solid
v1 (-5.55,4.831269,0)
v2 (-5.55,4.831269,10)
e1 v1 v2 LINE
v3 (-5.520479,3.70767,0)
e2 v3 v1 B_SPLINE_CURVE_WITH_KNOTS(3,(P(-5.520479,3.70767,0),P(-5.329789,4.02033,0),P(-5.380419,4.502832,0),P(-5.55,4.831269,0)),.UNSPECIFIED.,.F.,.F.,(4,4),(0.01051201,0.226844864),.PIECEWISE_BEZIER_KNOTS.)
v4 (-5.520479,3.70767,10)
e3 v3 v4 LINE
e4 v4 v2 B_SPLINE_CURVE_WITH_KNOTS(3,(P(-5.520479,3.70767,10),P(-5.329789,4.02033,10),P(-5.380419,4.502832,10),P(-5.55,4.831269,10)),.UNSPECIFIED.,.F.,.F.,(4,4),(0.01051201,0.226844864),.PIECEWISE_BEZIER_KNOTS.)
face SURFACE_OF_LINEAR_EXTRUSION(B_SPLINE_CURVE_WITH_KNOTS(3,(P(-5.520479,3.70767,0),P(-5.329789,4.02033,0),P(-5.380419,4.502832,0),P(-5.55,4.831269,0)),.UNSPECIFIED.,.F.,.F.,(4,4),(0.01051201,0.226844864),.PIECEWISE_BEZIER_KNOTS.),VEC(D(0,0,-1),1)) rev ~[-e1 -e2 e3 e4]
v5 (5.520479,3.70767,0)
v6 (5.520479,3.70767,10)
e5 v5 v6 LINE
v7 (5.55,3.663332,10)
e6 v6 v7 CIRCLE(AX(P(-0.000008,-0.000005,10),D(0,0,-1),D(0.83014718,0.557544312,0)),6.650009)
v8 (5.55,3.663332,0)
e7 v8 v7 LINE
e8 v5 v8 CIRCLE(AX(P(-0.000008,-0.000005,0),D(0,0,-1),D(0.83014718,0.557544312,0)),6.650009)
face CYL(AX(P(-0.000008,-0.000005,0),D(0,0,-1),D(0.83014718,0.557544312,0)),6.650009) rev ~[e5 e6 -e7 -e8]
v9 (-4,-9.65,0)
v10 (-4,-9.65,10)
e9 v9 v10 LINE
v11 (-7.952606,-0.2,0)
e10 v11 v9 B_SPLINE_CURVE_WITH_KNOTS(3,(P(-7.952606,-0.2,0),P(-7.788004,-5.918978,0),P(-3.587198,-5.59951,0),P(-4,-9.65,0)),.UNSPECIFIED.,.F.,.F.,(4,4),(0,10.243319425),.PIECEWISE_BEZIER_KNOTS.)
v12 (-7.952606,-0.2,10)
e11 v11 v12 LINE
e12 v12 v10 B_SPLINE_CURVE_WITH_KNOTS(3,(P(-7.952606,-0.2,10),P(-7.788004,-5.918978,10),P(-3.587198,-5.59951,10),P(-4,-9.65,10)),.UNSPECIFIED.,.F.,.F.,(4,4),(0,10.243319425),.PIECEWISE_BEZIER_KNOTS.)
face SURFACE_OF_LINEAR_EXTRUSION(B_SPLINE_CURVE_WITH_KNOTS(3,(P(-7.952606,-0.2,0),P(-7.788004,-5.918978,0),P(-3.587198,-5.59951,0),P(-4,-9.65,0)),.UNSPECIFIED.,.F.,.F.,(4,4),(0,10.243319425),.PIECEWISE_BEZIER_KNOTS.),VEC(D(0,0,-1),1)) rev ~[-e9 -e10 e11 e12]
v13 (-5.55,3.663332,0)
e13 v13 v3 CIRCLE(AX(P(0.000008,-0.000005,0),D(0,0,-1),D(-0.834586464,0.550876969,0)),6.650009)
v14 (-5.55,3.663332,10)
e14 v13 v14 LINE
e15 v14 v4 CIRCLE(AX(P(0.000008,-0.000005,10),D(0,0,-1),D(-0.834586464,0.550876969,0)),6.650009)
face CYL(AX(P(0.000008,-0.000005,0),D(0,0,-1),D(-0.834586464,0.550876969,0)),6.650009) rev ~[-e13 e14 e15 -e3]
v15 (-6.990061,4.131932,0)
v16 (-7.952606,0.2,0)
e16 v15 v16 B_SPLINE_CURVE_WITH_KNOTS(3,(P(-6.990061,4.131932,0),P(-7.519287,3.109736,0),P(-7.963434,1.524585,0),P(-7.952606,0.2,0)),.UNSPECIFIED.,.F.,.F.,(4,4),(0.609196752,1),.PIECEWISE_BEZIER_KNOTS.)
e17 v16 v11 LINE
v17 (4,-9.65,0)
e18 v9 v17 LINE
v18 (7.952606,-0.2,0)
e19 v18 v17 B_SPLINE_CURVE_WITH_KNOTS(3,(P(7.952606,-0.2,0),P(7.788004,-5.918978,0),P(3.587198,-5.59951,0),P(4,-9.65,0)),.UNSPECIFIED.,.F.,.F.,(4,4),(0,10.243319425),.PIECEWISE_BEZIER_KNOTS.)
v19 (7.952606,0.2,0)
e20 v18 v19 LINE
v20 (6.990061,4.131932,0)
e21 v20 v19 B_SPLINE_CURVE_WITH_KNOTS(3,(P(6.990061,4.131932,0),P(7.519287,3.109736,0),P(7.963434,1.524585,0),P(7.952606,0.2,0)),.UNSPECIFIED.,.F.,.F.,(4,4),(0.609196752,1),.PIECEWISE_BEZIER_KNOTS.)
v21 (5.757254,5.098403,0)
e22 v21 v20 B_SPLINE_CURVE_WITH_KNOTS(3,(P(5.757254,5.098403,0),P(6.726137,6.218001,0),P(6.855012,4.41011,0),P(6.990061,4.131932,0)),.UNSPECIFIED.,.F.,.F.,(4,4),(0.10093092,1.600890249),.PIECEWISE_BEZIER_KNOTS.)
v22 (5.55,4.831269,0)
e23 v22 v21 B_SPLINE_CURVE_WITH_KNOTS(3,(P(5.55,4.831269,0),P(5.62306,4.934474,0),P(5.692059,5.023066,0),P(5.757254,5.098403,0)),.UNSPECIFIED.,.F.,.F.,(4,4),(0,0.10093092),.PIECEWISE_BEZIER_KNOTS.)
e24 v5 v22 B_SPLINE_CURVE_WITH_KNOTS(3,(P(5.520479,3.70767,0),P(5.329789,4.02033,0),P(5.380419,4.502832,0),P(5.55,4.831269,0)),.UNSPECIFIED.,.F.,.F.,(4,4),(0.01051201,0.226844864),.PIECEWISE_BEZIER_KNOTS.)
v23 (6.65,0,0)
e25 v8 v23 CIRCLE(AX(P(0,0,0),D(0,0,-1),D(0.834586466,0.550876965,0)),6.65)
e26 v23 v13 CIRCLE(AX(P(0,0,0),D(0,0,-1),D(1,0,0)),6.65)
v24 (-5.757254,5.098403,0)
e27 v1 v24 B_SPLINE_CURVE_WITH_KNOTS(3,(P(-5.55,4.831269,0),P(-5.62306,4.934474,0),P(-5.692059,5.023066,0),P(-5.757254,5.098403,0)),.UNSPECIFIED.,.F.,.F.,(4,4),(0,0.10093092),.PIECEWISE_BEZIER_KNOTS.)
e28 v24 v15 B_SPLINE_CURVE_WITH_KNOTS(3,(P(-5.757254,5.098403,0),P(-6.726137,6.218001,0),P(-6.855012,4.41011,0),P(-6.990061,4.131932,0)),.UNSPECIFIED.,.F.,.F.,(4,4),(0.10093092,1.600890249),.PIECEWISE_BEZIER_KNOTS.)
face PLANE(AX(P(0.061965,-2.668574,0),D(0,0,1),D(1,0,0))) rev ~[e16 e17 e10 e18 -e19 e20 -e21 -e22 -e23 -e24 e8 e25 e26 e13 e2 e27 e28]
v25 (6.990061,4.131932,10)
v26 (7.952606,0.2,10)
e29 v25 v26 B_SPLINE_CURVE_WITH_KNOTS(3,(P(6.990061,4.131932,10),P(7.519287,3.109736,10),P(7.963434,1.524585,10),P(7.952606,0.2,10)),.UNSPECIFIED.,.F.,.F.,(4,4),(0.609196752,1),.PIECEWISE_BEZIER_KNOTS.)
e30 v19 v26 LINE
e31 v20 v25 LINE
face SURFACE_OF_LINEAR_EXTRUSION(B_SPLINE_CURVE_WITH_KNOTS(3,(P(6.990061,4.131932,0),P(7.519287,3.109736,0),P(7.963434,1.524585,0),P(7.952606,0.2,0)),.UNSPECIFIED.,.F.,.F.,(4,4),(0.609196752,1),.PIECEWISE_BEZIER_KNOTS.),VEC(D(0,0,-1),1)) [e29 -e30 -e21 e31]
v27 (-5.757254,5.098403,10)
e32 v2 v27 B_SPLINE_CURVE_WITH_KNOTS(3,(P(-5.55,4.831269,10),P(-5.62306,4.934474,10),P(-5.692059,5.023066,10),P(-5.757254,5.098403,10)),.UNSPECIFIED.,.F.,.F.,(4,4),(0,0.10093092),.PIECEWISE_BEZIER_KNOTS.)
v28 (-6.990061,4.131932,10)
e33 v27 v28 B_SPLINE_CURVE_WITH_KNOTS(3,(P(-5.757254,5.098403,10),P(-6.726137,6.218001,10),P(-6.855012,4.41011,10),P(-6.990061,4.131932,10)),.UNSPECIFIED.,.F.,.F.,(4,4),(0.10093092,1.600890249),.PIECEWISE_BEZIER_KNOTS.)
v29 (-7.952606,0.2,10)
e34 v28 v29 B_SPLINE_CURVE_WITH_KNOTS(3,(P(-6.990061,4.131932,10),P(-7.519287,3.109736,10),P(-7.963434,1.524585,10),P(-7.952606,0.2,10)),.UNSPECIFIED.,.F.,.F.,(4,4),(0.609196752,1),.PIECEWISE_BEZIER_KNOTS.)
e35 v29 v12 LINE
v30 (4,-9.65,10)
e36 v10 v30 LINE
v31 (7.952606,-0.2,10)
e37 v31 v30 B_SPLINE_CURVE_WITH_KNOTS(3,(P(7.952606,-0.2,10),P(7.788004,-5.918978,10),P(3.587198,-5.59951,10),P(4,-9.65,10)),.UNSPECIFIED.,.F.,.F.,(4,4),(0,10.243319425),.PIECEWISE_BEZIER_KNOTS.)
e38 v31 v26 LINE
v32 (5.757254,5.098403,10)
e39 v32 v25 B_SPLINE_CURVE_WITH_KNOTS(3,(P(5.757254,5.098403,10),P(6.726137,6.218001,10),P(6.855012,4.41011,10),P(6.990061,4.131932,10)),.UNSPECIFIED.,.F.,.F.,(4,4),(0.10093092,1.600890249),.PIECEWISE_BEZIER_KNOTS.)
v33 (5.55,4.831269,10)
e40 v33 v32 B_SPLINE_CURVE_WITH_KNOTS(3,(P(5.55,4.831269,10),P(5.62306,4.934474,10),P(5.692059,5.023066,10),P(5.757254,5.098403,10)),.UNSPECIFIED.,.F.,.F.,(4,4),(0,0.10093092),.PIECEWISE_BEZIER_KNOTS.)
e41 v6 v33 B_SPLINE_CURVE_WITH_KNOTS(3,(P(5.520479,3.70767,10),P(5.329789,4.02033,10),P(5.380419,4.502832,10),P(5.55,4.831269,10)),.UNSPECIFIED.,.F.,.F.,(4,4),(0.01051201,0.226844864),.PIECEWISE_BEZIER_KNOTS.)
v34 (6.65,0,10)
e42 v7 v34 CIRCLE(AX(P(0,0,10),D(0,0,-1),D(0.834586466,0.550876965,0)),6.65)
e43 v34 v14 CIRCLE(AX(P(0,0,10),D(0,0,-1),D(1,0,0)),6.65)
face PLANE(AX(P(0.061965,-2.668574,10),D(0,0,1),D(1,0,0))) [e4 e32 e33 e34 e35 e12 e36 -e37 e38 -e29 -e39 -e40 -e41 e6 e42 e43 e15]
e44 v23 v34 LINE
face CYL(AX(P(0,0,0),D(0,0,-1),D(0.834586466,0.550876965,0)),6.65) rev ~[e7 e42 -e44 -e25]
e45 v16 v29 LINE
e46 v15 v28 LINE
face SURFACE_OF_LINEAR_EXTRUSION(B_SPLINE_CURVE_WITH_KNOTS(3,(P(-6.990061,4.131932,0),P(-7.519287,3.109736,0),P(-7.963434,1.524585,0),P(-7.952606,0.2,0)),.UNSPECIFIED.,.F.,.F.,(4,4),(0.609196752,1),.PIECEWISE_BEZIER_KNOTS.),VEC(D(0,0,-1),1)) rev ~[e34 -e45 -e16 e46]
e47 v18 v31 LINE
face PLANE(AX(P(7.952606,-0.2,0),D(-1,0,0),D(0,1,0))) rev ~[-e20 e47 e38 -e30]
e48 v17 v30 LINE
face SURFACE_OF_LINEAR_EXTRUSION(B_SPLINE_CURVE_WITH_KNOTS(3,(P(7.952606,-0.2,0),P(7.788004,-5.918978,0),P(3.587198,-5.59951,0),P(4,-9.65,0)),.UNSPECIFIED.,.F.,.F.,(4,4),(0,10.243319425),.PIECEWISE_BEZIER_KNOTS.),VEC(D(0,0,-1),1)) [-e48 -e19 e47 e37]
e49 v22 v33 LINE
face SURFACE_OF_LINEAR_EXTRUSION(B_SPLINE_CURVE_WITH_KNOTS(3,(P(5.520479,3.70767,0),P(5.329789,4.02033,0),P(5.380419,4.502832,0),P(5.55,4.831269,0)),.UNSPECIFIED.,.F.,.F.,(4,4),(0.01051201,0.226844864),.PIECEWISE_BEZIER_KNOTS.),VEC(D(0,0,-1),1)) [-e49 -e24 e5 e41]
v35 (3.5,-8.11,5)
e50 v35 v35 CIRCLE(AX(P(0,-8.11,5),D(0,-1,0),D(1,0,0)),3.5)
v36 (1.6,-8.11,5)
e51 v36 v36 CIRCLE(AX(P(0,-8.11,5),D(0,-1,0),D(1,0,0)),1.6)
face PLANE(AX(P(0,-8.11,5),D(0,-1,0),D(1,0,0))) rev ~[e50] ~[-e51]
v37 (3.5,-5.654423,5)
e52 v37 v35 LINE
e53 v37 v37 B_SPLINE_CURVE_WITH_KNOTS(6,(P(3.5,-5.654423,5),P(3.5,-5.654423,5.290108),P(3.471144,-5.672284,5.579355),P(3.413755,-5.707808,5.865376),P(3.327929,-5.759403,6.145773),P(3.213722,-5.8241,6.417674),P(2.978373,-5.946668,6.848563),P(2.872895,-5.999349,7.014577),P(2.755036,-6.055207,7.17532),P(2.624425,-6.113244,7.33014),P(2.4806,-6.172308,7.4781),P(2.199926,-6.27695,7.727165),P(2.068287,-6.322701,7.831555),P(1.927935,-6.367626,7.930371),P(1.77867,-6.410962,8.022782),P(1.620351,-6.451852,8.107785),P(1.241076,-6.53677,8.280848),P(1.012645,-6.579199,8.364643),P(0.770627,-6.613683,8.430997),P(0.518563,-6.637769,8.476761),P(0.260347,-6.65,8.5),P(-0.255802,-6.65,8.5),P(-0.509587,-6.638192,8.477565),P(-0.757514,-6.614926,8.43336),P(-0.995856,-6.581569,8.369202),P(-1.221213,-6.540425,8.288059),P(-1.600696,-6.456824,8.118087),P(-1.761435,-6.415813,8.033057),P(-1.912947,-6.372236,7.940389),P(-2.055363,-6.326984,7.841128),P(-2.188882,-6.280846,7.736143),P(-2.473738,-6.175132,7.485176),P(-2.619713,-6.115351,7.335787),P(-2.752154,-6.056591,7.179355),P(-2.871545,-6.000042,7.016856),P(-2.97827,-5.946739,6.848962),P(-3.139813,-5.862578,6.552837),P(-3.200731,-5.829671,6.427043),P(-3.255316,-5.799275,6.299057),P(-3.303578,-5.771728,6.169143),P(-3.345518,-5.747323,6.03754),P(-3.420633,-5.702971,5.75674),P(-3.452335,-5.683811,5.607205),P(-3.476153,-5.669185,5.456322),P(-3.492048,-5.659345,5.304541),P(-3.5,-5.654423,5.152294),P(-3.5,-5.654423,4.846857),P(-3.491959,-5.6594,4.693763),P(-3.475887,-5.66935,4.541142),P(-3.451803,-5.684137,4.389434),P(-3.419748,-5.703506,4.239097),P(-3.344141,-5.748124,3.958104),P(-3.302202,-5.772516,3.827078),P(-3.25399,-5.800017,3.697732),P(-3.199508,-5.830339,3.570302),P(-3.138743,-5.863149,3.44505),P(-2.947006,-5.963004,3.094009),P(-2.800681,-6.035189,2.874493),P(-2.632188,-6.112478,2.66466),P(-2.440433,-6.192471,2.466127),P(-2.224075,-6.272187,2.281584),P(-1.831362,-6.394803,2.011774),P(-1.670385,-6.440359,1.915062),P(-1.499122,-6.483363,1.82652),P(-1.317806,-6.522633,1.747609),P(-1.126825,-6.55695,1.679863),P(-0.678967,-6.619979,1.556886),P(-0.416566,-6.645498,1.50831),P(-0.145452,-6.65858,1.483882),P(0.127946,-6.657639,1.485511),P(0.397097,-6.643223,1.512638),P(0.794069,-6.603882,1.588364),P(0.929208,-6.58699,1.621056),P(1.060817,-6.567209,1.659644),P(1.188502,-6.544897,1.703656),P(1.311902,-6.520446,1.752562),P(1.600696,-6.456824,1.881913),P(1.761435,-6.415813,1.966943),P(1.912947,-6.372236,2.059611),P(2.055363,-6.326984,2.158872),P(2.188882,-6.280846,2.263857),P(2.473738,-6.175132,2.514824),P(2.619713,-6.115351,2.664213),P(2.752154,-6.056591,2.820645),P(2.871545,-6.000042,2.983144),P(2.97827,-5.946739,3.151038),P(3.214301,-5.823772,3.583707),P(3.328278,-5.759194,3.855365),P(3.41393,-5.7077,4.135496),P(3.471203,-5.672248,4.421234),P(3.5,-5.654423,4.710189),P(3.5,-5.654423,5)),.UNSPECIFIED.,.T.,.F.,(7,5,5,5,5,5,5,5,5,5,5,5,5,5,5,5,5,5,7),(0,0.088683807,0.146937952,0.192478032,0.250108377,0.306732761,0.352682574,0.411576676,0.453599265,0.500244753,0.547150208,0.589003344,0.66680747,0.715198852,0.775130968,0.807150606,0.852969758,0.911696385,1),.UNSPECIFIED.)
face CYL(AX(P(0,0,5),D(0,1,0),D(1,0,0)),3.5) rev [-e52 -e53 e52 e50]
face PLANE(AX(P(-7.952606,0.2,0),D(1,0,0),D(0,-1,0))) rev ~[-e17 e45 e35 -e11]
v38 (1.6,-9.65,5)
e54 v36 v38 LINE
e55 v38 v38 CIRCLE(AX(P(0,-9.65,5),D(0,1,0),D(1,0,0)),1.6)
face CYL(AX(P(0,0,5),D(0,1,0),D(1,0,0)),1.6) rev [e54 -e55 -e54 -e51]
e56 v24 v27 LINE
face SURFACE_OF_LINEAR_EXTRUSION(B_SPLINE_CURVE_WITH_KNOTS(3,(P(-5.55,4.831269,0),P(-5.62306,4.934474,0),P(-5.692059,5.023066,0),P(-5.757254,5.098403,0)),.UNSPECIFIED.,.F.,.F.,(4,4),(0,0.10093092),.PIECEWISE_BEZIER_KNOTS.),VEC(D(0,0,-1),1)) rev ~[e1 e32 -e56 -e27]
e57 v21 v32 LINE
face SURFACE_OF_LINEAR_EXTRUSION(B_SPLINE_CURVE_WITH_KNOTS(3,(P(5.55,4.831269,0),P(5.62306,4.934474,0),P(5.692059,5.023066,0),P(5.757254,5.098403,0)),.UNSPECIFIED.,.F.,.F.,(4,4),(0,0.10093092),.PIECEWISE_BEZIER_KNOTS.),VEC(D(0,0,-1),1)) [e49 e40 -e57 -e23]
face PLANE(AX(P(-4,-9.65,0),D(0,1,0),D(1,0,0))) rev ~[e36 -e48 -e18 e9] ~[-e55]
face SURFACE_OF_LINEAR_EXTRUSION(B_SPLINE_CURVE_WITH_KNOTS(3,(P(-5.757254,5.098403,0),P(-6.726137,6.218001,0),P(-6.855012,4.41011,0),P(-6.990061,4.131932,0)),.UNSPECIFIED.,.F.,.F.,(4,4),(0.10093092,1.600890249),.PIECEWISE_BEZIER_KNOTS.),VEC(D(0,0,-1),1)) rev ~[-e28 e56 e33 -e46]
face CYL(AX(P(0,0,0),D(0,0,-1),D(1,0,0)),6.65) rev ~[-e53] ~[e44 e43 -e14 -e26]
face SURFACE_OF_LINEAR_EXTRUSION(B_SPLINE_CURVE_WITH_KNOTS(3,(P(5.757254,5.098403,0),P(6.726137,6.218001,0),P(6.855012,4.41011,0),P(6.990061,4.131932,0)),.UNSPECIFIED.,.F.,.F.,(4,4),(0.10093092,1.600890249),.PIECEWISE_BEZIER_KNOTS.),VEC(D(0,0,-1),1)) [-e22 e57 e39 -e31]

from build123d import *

# Parameters (mm, degrees)
F1_DEPTH = 10
F2_R     = 1.6
F3_DEPTH = 23.7
F2_R_2   = 3.5
F4_DEPTH = 8.11


with BuildPart() as f1:
    # F0 (on Top) → F1 (new body)
    with BuildSketch(Plane.XY):
        with BuildLine():
            ThreePointArc((5.55, 3.6633318168), (6.3690658656, 1.9124591499), (6.65, 0))
            ThreePointArc((6.65, 0), (-1.9124591499, -6.3690658656), (-5.55, 3.6633318168))
            ThreePointArc((-5.55, 3.6633318168), (-5.5352837539, 3.6855303232), (-5.5204787204, 3.7076697127))
            add(Edge.make_bspline(
                [(-5.5204787204, 3.7076697127), (-5.3297892382, 4.0203295099), (-5.3804192174, 4.5028316873), (-5.55, 4.8312691983)],
                knots=[0.0105120097, 0.0105120097, 0.0105120097, 0.0105120097, 0.2268448642, 0.2268448642, 0.2268448642, 0.2268448642], degree=3))
            add(Edge.make_bspline(
                [(-5.55, 4.8312691983), (-5.6230599396, 4.9344742738), (-5.6920586566, 5.0230662013), (-5.7572539606, 5.0984029712)],
                knots=[0, 0, 0, 0, 0.1009309198, 0.1009309198, 0.1009309198, 0.1009309198], degree=3))
            add(Edge.make_bspline(
                [(-5.7572539606, 5.0984029712), (-5.8127692495, 5.1426175603), (-6.1763134647, 5.3226921748), (-6.6399504917, 4.8081685915), (-6.9900612717, 4.1319315673)],
                knots=[0.2997379692, 0.2997379692, 0.2997379692, 0.2997379692, 0.350659585, 0.6091967522, 0.6091967522, 0.6091967522, 0.6091967522], degree=3))
            add(Edge.make_bspline(
                [(-6.9900612717, 4.1319315673), (-7.5192866492, 3.1097356941), (-7.9634342646, 1.5245852987), (-7.952605829, 0.2)],
                knots=[0.6091967522, 0.6091967522, 0.6091967522, 0.6091967522, 1, 1, 1, 1], degree=3))
            Line((-7.952605829, 0.2), (-7.952605829, 0))
            Line((-7.952605829, 0), (-7.952605829, -0.2))
            add(Edge.make_bspline(
                [(-7.952605829, -0.2), (-7.7880043421, -5.9189782478), (-3.58719808, -5.5995097942), (-4, -9.65)],
                knots=[0, 0, 0, 0, 10.2433194248, 10.2433194248, 10.2433194248, 10.2433194248], degree=3))
            Line((-4, -9.65), (0, -9.65))
            Line((0, -9.65), (4, -9.65))
            add(Edge.make_bspline(
                [(7.952605829, -0.2), (7.7880043421, -5.9189782478), (3.58719808, -5.5995097942), (4, -9.65)],
                knots=[0, 0, 0, 0, 10.2433194248, 10.2433194248, 10.2433194248, 10.2433194248], degree=3))
            Line((7.952605829, -0.2), (7.952605829, 0))
            Line((7.952605829, 0), (7.952605829, 0.2))
            add(Edge.make_bspline(
                [(6.9900612717, 4.1319315673), (7.5192866492, 3.1097356941), (7.9634342646, 1.5245852987), (7.952605829, 0.2)],
                knots=[0.6091967522, 0.6091967522, 0.6091967522, 0.6091967522, 1, 1, 1, 1], degree=3))
            add(Edge.make_bspline(
                [(5.7572539606, 5.0984029712), (5.8127692495, 5.1426175603), (6.1763134647, 5.3226921748), (6.6399504917, 4.8081685915), (6.9900612717, 4.1319315673)],
                knots=[0.2997379692, 0.2997379692, 0.2997379692, 0.2997379692, 0.350659585, 0.6091967522, 0.6091967522, 0.6091967522, 0.6091967522], degree=3))
            add(Edge.make_bspline(
                [(5.55, 4.8312691983), (5.6230599396, 4.9344742738), (5.6920586566, 5.0230662013), (5.7572539606, 5.0984029712)],
                knots=[0, 0, 0, 0, 0.1009309198, 0.1009309198, 0.1009309198, 0.1009309198], degree=3))
            add(Edge.make_bspline(
                [(5.5204787204, 3.7076697127), (5.3297892382, 4.0203295099), (5.3804192174, 4.5028316873), (5.55, 4.8312691983)],
                knots=[0.0105120097, 0.0105120097, 0.0105120097, 0.0105120097, 0.2268448642, 0.2268448642, 0.2268448642, 0.2268448642], degree=3))
            ThreePointArc((5.5204787204, 3.7076697127), (5.5352837539, 3.6855303232), (5.55, 3.6633318168))
        make_face()
        with BuildLine():
            add(Edge.make_bspline(
                [(5.7572539606, 5.0984029712), (6.726137476, 6.2180013153), (6.8550118896, 4.4101097728), (6.9900612717, 4.1319315673)],
                knots=[0.1009309198, 0.1009309198, 0.1009309198, 0.1009309198, 1.6008902487, 1.6008902487, 1.6008902487, 1.6008902487], degree=3))
            add(Edge.make_bspline(
                [(5.7572539606, 5.0984029712), (5.8127692495, 5.1426175603), (6.1763134647, 5.3226921748), (6.6399504917, 4.8081685915), (6.9900612717, 4.1319315673)],
                knots=[0.2997379692, 0.2997379692, 0.2997379692, 0.2997379692, 0.350659585, 0.6091967522, 0.6091967522, 0.6091967522, 0.6091967522], degree=3))
        make_face()
        with BuildLine():
            add(Edge.make_bspline(
                [(-5.7572539606, 5.0984029712), (-5.8127692495, 5.1426175603), (-6.1763134647, 5.3226921748), (-6.6399504917, 4.8081685915), (-6.9900612717, 4.1319315673)],
                knots=[0.2997379692, 0.2997379692, 0.2997379692, 0.2997379692, 0.350659585, 0.6091967522, 0.6091967522, 0.6091967522, 0.6091967522], degree=3))
            add(Edge.make_bspline(
                [(-5.7572539606, 5.0984029712), (-6.726137476, 6.2180013153), (-6.8550118896, 4.4101097728), (-6.9900612717, 4.1319315673)],
                knots=[0.1009309198, 0.1009309198, 0.1009309198, 0.1009309198, 1.6008902487, 1.6008902487, 1.6008902487, 1.6008902487], degree=3))
        make_face()
    extrude(amount=F1_DEPTH)

    # F2 (on Front) → F3 (cut)
    with BuildSketch(Plane.XZ):
        with Locations((0, 5)):
            Circle(F2_R)
    extrude(amount=F3_DEPTH, mode=Mode.SUBTRACT)

    # F2 (on Front) → F4 (cut)
    with BuildSketch(Plane.XZ):
        with Locations((0, 5)):
            Circle(F2_R_2)
        with Locations((0, 5)):
            Circle(F2_R, mode=Mode.SUBTRACT)
    extrude(amount=F4_DEPTH, mode=Mode.SUBTRACT)


solid = f1.part
